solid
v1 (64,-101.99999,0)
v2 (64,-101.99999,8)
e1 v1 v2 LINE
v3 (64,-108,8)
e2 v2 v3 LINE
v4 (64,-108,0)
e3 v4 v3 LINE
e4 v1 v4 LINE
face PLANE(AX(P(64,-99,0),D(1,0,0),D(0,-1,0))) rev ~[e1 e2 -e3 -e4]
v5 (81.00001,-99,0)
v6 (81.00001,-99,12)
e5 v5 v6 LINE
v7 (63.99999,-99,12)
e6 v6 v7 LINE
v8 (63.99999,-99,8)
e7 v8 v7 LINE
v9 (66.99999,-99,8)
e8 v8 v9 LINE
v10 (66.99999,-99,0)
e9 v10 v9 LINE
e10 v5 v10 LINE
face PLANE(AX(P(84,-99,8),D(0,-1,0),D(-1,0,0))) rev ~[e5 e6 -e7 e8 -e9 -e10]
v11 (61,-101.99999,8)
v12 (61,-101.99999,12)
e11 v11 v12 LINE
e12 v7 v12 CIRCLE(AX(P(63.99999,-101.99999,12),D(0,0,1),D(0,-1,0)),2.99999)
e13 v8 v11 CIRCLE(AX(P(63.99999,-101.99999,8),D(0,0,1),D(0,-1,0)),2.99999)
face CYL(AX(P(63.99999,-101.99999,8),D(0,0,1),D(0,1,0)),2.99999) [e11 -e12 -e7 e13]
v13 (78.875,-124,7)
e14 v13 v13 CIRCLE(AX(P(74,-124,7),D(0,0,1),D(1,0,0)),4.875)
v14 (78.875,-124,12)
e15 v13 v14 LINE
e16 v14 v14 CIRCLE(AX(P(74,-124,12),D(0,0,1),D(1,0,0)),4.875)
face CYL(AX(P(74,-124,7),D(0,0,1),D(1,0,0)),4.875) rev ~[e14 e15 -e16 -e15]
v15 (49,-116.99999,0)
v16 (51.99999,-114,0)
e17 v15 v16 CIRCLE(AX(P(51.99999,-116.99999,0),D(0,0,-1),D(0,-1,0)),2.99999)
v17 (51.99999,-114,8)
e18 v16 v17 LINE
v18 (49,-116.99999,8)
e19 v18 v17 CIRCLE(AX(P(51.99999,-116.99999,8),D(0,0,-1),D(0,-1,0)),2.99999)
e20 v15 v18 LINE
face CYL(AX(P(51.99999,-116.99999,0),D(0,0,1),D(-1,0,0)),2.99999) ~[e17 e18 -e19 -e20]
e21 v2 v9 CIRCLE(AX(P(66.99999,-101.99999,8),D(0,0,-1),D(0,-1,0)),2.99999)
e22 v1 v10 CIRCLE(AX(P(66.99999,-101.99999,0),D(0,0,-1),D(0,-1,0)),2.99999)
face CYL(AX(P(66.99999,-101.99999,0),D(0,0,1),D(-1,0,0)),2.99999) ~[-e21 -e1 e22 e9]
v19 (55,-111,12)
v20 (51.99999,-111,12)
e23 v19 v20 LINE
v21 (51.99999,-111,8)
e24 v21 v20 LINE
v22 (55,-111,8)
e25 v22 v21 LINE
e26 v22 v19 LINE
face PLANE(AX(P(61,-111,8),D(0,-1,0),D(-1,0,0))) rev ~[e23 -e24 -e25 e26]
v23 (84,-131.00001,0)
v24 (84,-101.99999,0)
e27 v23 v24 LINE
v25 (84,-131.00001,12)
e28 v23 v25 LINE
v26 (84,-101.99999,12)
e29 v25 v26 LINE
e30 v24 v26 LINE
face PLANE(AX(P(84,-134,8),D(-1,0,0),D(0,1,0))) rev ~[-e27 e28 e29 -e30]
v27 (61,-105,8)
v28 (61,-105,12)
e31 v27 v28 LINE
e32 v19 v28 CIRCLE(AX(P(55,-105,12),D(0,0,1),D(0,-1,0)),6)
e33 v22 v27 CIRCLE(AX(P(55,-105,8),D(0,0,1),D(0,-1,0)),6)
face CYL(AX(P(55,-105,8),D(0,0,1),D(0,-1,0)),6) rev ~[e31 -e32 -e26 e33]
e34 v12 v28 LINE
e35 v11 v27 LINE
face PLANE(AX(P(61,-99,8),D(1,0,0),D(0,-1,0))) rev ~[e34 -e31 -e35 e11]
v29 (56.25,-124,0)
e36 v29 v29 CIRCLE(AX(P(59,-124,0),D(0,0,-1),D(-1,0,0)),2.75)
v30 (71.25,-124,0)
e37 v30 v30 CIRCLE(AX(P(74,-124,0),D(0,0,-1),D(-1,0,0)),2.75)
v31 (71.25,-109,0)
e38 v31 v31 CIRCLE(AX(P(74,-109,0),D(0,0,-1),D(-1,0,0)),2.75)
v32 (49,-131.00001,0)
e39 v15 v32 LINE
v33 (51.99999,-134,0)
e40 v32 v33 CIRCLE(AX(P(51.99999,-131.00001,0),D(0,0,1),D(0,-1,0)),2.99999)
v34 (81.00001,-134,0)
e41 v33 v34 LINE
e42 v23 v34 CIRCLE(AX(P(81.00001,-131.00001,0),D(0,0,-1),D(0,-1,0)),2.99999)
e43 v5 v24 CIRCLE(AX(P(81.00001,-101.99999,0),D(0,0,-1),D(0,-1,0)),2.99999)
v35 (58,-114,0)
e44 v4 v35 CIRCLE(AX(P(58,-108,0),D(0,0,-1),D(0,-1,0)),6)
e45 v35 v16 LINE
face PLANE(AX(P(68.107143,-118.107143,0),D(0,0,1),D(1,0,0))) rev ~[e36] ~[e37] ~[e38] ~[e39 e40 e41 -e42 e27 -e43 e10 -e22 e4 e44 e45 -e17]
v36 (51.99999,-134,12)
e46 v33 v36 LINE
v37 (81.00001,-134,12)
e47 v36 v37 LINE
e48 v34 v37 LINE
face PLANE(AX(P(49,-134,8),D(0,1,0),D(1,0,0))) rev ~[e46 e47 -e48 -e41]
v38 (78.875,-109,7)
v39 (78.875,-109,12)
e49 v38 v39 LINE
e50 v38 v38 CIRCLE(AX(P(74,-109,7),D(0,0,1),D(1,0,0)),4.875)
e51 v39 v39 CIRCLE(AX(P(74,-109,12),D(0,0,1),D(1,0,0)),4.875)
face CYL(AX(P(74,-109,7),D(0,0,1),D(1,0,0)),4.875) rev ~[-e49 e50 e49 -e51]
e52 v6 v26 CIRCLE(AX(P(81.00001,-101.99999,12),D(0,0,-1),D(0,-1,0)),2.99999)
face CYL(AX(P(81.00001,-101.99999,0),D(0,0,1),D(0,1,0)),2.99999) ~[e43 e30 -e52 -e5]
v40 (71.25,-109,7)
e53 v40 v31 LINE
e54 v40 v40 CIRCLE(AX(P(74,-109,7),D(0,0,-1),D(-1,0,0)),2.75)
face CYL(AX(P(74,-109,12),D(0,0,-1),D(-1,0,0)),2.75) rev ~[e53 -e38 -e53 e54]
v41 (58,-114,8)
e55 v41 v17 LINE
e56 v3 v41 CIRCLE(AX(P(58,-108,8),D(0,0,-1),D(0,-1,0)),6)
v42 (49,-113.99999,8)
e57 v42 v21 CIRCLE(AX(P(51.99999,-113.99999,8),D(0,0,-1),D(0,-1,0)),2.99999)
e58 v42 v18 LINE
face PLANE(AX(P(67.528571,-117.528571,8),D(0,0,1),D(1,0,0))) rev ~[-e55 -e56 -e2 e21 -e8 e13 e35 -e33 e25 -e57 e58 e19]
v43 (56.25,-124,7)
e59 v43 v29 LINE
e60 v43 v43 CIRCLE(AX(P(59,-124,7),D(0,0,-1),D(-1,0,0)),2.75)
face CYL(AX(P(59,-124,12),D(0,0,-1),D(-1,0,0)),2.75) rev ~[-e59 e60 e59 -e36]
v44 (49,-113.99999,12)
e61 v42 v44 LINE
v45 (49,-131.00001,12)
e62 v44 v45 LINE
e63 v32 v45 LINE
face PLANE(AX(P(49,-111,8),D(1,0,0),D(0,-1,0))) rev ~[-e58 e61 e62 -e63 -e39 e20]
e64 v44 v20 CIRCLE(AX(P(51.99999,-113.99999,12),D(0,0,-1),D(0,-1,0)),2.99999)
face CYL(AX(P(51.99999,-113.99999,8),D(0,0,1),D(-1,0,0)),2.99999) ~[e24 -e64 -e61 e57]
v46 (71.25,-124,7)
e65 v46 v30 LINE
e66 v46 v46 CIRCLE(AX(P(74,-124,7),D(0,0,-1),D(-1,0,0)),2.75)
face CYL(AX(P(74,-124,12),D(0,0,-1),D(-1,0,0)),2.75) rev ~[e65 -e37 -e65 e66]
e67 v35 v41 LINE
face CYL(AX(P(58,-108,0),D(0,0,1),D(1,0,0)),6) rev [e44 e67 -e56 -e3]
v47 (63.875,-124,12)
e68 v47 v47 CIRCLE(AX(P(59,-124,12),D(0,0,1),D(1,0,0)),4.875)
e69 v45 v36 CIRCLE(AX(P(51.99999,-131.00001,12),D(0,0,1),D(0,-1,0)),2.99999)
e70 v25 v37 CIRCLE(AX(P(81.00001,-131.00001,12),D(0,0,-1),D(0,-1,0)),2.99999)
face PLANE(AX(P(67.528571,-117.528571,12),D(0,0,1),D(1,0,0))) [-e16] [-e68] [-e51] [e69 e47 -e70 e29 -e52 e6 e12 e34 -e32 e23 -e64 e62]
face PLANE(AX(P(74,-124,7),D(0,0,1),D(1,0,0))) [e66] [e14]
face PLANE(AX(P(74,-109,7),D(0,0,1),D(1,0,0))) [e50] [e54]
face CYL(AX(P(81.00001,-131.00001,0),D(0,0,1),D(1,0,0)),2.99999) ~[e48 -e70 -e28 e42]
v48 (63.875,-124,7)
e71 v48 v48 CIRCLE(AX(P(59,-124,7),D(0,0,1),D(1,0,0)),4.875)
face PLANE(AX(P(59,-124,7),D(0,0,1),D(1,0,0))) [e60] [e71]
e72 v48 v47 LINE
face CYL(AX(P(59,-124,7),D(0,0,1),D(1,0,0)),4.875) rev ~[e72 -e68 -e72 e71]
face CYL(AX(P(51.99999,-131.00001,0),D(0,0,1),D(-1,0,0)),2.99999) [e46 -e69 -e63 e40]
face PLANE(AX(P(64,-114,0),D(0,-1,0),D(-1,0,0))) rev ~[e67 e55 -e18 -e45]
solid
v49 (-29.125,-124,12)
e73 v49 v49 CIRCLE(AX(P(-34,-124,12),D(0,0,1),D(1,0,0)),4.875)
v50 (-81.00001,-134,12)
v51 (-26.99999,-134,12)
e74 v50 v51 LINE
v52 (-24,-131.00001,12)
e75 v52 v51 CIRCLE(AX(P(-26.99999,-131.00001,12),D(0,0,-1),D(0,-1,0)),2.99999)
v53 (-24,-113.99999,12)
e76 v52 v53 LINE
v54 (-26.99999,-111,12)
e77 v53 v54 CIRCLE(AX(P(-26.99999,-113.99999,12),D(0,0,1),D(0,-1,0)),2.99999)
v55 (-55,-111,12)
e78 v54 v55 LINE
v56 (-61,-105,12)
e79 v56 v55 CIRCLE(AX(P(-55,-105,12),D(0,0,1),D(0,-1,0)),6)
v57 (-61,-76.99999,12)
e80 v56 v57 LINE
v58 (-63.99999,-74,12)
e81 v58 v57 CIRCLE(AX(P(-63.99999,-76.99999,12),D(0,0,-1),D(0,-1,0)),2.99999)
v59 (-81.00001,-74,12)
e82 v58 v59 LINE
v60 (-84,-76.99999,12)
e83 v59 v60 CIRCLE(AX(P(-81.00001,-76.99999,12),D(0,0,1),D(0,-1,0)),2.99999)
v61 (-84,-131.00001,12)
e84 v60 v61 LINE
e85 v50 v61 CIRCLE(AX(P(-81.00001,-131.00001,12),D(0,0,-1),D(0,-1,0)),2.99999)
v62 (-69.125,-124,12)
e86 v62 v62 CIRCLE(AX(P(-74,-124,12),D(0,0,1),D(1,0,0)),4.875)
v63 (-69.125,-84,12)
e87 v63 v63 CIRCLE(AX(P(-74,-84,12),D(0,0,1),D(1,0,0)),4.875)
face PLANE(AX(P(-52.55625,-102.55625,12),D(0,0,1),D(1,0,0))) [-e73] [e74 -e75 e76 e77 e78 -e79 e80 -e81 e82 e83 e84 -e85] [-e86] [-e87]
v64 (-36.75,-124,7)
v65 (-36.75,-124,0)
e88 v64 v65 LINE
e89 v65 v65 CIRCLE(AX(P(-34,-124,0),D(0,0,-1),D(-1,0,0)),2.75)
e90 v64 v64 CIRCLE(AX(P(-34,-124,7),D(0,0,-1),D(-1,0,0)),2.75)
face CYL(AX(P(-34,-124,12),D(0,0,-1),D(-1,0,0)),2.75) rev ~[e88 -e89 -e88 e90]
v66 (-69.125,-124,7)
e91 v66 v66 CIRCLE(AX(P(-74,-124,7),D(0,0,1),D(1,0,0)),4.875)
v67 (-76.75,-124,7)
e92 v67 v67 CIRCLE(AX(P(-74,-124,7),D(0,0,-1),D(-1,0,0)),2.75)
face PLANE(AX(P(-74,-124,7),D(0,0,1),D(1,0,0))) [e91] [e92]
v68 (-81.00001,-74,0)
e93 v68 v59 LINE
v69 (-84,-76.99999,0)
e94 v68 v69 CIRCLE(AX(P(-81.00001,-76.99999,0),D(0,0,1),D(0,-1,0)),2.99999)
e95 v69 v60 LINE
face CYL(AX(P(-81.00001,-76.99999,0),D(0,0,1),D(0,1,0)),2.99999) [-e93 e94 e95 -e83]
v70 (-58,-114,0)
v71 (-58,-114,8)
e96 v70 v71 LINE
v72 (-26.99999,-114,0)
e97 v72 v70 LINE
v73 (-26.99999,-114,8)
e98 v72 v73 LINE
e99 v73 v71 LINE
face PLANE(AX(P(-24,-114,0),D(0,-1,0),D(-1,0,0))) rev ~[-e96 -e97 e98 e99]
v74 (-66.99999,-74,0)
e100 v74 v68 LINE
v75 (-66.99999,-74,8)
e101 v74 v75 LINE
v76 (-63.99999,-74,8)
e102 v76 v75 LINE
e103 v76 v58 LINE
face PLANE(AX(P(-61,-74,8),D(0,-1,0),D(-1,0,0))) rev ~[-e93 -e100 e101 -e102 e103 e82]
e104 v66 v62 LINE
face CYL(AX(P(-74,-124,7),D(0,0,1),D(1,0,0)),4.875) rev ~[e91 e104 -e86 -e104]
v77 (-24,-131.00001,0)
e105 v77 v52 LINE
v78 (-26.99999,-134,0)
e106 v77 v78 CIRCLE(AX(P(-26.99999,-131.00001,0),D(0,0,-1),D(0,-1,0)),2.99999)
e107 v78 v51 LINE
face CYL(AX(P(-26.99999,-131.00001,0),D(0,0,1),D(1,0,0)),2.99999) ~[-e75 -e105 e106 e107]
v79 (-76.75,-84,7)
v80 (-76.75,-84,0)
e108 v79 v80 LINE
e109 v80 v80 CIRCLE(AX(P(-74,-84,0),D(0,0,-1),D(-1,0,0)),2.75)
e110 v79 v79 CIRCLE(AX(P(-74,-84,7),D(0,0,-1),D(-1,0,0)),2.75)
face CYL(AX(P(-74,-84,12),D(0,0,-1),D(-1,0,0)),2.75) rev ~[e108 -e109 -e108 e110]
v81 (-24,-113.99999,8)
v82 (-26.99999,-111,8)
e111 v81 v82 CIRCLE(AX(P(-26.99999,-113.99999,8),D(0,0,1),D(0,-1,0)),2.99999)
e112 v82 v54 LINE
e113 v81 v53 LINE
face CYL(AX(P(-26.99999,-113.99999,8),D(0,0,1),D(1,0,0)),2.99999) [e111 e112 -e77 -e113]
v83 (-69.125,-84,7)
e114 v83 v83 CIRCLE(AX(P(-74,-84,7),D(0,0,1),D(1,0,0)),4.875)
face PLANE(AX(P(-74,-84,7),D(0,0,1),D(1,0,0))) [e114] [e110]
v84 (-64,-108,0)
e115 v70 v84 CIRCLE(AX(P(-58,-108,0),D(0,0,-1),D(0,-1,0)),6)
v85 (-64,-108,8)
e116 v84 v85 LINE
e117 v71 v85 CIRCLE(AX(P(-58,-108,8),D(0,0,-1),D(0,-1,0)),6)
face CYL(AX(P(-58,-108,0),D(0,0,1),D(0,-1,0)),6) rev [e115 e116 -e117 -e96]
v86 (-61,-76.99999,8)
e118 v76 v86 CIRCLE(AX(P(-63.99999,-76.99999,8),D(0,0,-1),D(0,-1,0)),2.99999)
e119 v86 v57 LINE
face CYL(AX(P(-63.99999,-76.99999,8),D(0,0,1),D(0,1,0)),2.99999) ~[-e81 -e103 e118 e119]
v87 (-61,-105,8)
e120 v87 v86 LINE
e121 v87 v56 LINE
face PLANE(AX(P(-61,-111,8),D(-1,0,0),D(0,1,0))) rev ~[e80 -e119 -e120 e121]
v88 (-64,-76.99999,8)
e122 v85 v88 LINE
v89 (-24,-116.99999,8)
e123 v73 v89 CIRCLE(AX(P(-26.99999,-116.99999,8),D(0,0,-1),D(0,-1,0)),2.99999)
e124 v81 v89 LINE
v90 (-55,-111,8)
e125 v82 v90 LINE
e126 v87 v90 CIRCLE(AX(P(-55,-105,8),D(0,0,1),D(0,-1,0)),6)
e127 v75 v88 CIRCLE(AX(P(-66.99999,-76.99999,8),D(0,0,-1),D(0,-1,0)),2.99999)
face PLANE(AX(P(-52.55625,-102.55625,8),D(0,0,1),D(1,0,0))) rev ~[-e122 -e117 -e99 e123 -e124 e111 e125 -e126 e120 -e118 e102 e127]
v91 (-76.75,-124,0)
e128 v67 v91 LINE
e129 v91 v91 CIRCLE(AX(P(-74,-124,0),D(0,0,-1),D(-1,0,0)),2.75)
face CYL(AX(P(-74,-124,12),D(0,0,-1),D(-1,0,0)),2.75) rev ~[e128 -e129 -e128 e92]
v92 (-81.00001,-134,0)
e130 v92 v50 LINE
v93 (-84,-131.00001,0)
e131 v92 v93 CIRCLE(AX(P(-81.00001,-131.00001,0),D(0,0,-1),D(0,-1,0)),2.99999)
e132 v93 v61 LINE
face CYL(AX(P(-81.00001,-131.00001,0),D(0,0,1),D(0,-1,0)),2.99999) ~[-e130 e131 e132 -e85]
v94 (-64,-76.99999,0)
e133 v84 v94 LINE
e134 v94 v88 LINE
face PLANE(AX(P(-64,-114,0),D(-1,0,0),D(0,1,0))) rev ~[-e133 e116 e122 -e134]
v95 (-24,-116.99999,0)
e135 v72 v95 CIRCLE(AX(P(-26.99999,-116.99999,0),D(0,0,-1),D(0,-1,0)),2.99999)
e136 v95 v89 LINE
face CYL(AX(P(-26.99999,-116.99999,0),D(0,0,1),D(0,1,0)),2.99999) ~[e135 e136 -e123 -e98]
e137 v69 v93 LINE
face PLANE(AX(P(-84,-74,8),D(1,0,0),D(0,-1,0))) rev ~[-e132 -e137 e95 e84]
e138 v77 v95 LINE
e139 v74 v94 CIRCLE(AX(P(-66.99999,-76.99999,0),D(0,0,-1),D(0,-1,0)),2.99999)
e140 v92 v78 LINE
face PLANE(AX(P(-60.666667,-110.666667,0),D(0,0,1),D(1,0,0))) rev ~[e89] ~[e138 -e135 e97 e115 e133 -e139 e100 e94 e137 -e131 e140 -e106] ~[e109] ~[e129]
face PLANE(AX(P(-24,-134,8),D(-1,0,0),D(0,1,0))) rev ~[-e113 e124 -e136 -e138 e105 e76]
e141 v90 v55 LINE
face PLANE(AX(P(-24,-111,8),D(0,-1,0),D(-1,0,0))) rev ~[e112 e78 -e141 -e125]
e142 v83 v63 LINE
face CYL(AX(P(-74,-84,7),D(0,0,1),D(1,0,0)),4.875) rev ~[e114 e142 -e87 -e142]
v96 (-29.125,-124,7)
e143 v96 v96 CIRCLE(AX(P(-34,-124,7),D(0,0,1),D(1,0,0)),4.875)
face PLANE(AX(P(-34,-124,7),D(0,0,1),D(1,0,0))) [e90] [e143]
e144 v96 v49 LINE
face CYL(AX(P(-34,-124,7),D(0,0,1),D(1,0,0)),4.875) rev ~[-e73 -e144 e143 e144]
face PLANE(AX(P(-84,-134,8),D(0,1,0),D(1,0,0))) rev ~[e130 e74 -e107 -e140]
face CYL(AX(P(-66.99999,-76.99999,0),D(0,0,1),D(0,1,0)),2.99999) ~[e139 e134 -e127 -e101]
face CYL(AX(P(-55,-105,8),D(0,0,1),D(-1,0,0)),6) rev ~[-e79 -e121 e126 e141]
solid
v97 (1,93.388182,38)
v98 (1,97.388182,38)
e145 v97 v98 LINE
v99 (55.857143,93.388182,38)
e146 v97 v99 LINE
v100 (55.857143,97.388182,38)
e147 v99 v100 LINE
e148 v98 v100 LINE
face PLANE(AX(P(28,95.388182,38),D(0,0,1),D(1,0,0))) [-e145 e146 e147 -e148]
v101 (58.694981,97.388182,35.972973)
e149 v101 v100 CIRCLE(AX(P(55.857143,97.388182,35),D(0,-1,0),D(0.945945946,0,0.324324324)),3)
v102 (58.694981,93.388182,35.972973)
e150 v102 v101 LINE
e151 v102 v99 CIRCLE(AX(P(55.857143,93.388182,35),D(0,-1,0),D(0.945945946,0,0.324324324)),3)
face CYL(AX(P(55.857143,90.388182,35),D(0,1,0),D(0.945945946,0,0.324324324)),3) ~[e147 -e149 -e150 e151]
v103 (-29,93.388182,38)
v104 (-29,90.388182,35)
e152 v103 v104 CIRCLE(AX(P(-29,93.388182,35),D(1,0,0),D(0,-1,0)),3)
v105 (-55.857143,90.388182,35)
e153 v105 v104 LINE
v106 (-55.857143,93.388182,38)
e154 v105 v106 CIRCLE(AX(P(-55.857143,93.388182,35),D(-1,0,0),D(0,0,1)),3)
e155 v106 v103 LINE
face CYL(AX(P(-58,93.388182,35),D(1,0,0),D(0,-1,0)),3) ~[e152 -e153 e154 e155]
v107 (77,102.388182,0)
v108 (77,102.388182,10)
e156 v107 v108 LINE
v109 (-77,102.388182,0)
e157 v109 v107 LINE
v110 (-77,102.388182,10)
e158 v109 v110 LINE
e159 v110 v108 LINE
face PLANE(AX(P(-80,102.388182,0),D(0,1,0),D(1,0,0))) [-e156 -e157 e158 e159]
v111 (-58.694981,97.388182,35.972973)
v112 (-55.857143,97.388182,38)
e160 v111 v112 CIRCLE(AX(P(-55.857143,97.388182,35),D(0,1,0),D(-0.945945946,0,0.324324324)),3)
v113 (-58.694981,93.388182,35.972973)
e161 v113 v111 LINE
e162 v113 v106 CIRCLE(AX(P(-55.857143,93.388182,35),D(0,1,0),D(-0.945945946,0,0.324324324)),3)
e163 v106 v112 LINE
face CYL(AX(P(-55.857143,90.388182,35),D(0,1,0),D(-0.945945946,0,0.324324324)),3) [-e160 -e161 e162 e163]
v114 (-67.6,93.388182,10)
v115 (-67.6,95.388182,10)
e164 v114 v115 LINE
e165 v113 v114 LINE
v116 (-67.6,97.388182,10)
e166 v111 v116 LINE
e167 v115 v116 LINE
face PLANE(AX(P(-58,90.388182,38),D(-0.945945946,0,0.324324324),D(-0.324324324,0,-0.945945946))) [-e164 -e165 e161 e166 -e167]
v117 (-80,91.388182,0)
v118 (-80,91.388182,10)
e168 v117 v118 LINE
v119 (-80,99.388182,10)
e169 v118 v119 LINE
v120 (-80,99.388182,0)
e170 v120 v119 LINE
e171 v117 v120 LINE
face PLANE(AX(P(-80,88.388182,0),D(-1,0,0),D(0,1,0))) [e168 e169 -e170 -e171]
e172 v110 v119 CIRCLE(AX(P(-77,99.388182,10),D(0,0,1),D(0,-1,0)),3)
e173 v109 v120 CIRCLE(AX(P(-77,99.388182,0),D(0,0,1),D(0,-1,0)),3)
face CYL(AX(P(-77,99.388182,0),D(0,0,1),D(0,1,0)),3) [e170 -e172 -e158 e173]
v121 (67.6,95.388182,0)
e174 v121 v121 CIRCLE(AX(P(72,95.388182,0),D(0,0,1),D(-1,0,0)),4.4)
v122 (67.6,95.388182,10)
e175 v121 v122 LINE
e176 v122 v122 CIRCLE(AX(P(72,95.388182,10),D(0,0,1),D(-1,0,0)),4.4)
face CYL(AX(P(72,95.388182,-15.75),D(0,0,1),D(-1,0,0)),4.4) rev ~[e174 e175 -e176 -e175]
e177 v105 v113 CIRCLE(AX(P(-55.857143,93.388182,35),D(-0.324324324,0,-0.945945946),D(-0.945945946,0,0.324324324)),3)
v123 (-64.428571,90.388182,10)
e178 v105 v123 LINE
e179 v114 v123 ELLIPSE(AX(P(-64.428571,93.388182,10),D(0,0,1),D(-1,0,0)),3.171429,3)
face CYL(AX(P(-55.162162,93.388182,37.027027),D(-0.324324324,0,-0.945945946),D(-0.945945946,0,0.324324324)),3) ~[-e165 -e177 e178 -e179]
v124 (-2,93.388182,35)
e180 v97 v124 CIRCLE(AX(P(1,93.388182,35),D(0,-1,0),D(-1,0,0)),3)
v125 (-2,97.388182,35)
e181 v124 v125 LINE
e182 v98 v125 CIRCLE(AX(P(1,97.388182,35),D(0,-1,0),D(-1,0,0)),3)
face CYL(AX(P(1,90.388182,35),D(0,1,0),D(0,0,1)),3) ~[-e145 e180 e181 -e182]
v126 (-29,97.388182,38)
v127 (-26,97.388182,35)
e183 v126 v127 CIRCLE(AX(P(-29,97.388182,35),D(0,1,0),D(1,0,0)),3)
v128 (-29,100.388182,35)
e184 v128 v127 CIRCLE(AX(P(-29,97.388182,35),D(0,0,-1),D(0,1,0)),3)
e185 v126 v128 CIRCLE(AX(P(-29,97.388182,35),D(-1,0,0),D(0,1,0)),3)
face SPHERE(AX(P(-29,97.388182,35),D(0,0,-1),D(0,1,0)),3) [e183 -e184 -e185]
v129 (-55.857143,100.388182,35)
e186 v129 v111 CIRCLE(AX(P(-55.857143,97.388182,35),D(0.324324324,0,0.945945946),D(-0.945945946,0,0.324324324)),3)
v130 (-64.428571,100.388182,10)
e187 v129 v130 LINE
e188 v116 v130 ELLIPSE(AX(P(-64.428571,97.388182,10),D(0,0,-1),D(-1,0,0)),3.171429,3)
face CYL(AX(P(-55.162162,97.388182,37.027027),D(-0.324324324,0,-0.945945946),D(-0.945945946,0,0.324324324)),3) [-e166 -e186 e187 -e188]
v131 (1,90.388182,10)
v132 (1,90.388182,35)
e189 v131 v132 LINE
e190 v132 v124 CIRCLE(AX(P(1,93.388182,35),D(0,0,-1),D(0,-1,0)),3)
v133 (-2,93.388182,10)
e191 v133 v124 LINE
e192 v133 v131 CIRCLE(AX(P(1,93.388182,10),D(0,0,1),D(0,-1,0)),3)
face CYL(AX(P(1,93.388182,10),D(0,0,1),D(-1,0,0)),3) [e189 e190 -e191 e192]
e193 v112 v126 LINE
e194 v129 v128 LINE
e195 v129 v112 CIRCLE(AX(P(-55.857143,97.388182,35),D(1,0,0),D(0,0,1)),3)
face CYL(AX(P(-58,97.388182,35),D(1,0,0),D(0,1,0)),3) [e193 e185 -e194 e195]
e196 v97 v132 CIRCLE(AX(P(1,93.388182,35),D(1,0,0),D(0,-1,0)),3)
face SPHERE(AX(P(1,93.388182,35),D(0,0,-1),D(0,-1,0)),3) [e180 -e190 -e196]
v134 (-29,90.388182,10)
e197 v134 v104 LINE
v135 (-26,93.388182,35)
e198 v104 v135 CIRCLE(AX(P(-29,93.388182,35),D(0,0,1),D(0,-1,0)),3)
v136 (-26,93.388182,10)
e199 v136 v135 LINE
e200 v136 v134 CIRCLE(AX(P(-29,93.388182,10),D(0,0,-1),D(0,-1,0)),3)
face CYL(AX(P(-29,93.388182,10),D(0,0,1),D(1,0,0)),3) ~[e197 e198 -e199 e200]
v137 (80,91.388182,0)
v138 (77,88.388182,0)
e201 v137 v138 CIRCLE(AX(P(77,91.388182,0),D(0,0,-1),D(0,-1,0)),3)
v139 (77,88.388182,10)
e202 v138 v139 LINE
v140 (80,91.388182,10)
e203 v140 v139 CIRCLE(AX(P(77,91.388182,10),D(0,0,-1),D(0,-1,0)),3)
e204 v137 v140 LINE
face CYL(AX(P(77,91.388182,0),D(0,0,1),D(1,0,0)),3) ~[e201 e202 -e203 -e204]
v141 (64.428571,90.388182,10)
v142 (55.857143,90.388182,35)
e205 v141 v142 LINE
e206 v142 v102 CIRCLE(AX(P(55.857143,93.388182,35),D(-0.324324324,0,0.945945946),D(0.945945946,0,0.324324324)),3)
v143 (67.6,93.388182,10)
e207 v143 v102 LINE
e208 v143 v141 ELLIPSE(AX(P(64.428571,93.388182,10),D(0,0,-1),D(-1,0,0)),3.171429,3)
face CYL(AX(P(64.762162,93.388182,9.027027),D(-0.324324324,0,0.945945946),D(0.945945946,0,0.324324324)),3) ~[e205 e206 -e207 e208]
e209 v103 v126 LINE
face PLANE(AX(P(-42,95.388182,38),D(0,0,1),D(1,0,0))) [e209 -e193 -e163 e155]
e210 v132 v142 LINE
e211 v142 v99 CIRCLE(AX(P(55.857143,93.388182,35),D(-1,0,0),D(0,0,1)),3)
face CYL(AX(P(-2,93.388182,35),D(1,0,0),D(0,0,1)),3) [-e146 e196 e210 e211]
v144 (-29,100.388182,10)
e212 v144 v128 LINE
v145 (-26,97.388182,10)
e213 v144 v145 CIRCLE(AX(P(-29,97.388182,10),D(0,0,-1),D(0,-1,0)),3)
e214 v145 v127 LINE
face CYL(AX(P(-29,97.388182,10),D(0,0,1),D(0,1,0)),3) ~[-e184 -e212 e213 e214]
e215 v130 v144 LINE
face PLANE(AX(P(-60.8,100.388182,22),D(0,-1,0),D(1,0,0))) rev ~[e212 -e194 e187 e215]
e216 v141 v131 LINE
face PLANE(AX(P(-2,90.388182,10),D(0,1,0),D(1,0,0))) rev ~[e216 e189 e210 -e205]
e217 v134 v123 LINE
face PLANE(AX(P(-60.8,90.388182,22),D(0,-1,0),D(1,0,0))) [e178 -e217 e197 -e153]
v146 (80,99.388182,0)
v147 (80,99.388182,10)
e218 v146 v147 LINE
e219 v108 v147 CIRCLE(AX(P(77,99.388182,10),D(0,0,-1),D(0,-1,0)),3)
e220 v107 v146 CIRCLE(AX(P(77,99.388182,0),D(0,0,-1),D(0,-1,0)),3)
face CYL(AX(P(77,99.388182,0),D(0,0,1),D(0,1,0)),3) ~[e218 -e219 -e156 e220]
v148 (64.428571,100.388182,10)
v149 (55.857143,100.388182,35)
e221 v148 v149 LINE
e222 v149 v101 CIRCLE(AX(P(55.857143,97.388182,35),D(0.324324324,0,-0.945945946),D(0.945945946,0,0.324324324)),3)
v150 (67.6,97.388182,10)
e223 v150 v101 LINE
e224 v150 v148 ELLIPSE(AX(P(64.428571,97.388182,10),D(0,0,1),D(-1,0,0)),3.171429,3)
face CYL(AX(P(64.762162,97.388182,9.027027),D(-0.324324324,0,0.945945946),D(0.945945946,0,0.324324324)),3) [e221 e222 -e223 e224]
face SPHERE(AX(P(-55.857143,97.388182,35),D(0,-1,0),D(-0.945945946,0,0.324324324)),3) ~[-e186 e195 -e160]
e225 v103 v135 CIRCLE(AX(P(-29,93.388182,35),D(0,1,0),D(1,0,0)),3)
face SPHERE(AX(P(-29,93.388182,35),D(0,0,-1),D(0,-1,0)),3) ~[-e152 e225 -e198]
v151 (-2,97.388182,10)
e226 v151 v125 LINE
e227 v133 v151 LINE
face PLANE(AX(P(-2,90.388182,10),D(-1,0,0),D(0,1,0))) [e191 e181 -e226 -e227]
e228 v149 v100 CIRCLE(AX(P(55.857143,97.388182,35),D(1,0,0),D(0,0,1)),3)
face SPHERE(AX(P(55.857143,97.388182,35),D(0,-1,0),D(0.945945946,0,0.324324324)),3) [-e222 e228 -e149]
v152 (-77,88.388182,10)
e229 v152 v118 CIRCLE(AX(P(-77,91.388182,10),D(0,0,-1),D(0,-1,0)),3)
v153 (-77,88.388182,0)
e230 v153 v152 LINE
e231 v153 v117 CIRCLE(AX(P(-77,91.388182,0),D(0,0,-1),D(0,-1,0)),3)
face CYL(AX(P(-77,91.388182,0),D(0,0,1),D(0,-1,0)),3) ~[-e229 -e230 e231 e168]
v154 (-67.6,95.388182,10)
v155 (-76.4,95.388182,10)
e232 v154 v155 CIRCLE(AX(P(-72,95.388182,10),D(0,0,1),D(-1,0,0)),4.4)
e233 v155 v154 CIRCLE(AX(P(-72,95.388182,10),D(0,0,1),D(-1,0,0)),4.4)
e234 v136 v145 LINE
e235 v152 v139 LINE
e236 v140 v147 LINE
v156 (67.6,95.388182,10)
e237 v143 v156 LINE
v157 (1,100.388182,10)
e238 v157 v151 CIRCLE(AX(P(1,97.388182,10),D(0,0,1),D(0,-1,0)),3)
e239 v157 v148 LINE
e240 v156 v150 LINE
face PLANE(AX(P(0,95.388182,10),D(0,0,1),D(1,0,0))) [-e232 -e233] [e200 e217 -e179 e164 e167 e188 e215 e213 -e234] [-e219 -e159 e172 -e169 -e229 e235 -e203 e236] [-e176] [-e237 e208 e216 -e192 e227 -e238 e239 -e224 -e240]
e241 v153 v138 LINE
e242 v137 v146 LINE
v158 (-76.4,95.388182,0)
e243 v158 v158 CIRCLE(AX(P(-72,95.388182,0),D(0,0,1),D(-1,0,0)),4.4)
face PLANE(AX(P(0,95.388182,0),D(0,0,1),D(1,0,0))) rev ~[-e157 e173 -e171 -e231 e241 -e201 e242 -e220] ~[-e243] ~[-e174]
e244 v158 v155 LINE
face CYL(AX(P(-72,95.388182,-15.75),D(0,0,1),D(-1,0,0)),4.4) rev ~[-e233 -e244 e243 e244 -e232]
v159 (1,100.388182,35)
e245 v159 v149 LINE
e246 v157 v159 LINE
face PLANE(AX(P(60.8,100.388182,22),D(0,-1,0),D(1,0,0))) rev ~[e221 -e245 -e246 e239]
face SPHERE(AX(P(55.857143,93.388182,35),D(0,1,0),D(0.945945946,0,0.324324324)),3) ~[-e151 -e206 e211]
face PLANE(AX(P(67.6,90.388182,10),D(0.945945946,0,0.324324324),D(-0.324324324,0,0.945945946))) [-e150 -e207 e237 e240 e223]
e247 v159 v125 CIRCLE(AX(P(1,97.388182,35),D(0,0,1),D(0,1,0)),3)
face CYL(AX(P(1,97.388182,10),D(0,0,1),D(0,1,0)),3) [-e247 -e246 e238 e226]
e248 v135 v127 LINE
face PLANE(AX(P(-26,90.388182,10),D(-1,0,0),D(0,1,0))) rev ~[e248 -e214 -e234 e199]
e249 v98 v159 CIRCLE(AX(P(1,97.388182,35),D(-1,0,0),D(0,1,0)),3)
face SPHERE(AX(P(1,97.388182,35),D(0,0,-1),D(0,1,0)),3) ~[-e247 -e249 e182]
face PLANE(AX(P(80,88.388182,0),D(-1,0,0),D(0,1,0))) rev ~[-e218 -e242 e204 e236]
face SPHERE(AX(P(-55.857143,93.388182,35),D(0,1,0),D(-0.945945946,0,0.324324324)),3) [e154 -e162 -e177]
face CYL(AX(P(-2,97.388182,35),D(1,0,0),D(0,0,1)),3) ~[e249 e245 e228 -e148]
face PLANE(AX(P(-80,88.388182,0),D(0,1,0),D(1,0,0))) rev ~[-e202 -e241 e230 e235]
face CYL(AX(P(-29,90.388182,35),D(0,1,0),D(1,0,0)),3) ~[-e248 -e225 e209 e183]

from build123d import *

# Parameters (mm, degrees)
F1_DEPTH         = 8
F4_DEPTH         = 4
F5_R             = 2.99999
F5_2_R           = 2.99999
F6_R             = 6
F6_2_R           = 6
F8_D             = 5.5
F8_DEPTH         = 40
F8_CBORE_D       = 9.75
F8_CBORE_DEPTH   = 5
F8_TIP           = 1.6523667023
F8_2_D           = 5.5
F8_2_DEPTH       = 40
F8_2_CBORE_D     = 9.75
F8_2_CBORE_DEPTH = 5
F8_2_TIP         = 1.6523667023
F0_W             = 160
F0_H             = 14
F9_DEPTH         = 10
F10_W            = 32
F10_H            = 10
F10_W_2          = 60
F11_DEPTH        = 28
F12_D            = 8.8
F12_DEPTH        = 15.75
F12_TIP          = 2.6437867237
F14_DEPTH        = 10
F15_R            = 3


# Not quite as in the source:
# - a fillet or chamfer is up to 0.001 mm smaller than in the source, because OpenCascade refuses the exact size


with BuildPart() as f1:
    # F0 (on Top) → F1 (new body)
    with BuildSketch(Plane.XY):
        Polygon((-24, -114), (-64, -114), (-64, -74), (-84, -74), (-84, -134), (-24, -134), align=None)
    extrude(amount=F1_DEPTH)

    # F3 (on face) → F4 (join)
    with BuildSketch(Plane.XY.offset(8)):
        Polygon((-61, -74), (-64, -74), (-64, -114), (-24, -114), (-24, -111), (-61, -111), align=None)
        Polygon((-64, -74), (-84, -74), (-84, -134), (-24, -134), (-24, -114), (-64, -114), align=None)
    extrude(amount=F4_DEPTH)

    # F5 (radius 3 in the source; OpenCascade refuses exactly that, so slightly less here)
    f5_edges = [f1.edges().sort_by_distance(p)[0] for p in [
        (-84, -134, 6),
        (-24, -134, 6),
        (-84, -74, 6),
        (-64, -74, 4),
        (-24, -114, 4),
        (-61, -74, 10),
        (-24, -111, 10),
    ]]
    fillet(f5_edges, radius=F5_R)

    # F6#2
    f6_2_edges = [f1.edges().sort_by_distance(p)[0] for p in [
        (-64, -114, 4),
        (-61, -111, 10),
    ]]
    fillet(f6_2_edges, radius=F6_2_R)

    # F8
    with Locations(Plane.XY.offset(12)):
        with Locations((-74, -124), (-74, -84), (-34, -124), (59, -124), (74, -124), (74, -109)):
            CounterBoreHole(F8_D / 2, F8_CBORE_D / 2, F8_CBORE_DEPTH, depth=F8_DEPTH)
            with Locations((0, 0, -(F8_DEPTH + F8_TIP / 2))):  # 118° drill point
                Cone(0, F8_D / 2, F8_TIP, mode=Mode.SUBTRACT)


with BuildPart() as f1b:
    # F0 (on Top) → F1, piece 2 (new body)
    with BuildSketch(Plane.XY):
        Polygon((64, -99), (64, -114), (49, -114), (49, -134), (84, -134), (84, -99), align=None)
    extrude(amount=F1_DEPTH)

    # F3 (on face) → F4, piece 2 (join)
    with BuildSketch(Plane.XY.offset(8)):
        Polygon((49, -111), (49, -134), (84, -134), (84, -99), (61, -99), (61, -111), align=None)
    extrude(amount=F4_DEPTH)

    # F5#2 (radius 3 in the source; OpenCascade refuses exactly that, so slightly less here)
    f5_2_edges = [f1b.edges().sort_by_distance(p)[0] for p in [
        (49, -134, 6),
        (84, -134, 6),
        (84, -99, 6),
        (49, -114, 4),
        (64, -99, 4),
        (49, -111, 10),
        (61, -99, 10),
    ]]
    fillet(f5_2_edges, radius=F5_2_R)

    # F6
    f6_edges = [f1b.edges().sort_by_distance(p)[0] for p in [
        (64, -114, 4),
        (61, -111, 10),
    ]]
    fillet(f6_edges, radius=F6_R)

    # F8#2
    with Locations(Plane.XY.offset(12)):
        with Locations((-74, -124), (-74, -84), (-34, -124), (59, -124), (74, -124), (74, -109)):
            CounterBoreHole(F8_2_D / 2, F8_2_CBORE_D / 2, F8_2_CBORE_DEPTH, depth=F8_2_DEPTH)
            with Locations((0, 0, -(F8_2_DEPTH + F8_2_TIP / 2))):  # 118° drill point
                Cone(0, F8_2_D / 2, F8_2_TIP, mode=Mode.SUBTRACT)


with BuildPart() as f9:
    # F0 (on Top) → F9 (new body)
    with BuildSketch(Plane.XY):
        with Locations((0, 95.388181746)):
            Rectangle(F0_W, F0_H)
    extrude(amount=F9_DEPTH)

    # F10 (on face) → F11 (join)
    with BuildSketch(Plane.XY.offset(10)):
        with Locations((-42, 95.388181746)):
            Rectangle(F10_W, F10_H)
        with Locations((28, 95.388181746)):
            Rectangle(F10_W_2, F10_H)
    extrude(amount=F11_DEPTH)

    # F12
    with Locations(Plane(origin=(0, 0, 0), x_dir=(1, 0, 0), z_dir=(0, 0, -1))):
        with Locations((-72, -95.388181746), (72, -95.388181746)):
            Hole(F12_D / 2, depth=F12_DEPTH)
            with Locations((0, 0, -(F12_DEPTH + F12_TIP / 2))):  # 118° drill point
                Cone(0, F12_D / 2, F12_TIP, mode=Mode.SUBTRACT)

    # F13 (on face) → F14 (join, through all)
    with BuildSketch(Plane.XZ.offset(-90.388181746)):
        Polygon((-58, 38), (-67.6, 10), (-58, 10), align=None)
        Polygon((58, 10), (67.6, 10), (58, 38), align=None)
    extrude(amount=-F14_DEPTH)

    # F15
    f15_edges = [f9.edges().sort_by_distance(p)[0] for p in [
        (-80, 88.388182, 5),
        (-80, 102.388182, 5),
        (80, 88.388182, 5),
        (80, 102.388182, 5),
        (62.8, 100.388182, 24),
        (62.8, 90.388182, 24),
        (-62.8, 100.388182, 24),
        (-62.8, 90.388182, 24),
        (-2, 100.388182, 24),
        (-2, 90.388182, 24),
        (-26, 90.388182, 24),
        (-26, 100.388182, 24),
        (-42, 100.388182, 38),
        (-42, 90.388182, 38),
        (28, 90.388182, 38),
        (28, 100.388182, 38),
        (-2, 95.388182, 38),
        (-26, 95.388182, 38),
        (-58, 95.388182, 38),
        (58, 95.388182, 38),
    ]]
    fillet(f15_edges, radius=F15_R)


solid = Compound([f1.part, f1b.part, f9.part])
